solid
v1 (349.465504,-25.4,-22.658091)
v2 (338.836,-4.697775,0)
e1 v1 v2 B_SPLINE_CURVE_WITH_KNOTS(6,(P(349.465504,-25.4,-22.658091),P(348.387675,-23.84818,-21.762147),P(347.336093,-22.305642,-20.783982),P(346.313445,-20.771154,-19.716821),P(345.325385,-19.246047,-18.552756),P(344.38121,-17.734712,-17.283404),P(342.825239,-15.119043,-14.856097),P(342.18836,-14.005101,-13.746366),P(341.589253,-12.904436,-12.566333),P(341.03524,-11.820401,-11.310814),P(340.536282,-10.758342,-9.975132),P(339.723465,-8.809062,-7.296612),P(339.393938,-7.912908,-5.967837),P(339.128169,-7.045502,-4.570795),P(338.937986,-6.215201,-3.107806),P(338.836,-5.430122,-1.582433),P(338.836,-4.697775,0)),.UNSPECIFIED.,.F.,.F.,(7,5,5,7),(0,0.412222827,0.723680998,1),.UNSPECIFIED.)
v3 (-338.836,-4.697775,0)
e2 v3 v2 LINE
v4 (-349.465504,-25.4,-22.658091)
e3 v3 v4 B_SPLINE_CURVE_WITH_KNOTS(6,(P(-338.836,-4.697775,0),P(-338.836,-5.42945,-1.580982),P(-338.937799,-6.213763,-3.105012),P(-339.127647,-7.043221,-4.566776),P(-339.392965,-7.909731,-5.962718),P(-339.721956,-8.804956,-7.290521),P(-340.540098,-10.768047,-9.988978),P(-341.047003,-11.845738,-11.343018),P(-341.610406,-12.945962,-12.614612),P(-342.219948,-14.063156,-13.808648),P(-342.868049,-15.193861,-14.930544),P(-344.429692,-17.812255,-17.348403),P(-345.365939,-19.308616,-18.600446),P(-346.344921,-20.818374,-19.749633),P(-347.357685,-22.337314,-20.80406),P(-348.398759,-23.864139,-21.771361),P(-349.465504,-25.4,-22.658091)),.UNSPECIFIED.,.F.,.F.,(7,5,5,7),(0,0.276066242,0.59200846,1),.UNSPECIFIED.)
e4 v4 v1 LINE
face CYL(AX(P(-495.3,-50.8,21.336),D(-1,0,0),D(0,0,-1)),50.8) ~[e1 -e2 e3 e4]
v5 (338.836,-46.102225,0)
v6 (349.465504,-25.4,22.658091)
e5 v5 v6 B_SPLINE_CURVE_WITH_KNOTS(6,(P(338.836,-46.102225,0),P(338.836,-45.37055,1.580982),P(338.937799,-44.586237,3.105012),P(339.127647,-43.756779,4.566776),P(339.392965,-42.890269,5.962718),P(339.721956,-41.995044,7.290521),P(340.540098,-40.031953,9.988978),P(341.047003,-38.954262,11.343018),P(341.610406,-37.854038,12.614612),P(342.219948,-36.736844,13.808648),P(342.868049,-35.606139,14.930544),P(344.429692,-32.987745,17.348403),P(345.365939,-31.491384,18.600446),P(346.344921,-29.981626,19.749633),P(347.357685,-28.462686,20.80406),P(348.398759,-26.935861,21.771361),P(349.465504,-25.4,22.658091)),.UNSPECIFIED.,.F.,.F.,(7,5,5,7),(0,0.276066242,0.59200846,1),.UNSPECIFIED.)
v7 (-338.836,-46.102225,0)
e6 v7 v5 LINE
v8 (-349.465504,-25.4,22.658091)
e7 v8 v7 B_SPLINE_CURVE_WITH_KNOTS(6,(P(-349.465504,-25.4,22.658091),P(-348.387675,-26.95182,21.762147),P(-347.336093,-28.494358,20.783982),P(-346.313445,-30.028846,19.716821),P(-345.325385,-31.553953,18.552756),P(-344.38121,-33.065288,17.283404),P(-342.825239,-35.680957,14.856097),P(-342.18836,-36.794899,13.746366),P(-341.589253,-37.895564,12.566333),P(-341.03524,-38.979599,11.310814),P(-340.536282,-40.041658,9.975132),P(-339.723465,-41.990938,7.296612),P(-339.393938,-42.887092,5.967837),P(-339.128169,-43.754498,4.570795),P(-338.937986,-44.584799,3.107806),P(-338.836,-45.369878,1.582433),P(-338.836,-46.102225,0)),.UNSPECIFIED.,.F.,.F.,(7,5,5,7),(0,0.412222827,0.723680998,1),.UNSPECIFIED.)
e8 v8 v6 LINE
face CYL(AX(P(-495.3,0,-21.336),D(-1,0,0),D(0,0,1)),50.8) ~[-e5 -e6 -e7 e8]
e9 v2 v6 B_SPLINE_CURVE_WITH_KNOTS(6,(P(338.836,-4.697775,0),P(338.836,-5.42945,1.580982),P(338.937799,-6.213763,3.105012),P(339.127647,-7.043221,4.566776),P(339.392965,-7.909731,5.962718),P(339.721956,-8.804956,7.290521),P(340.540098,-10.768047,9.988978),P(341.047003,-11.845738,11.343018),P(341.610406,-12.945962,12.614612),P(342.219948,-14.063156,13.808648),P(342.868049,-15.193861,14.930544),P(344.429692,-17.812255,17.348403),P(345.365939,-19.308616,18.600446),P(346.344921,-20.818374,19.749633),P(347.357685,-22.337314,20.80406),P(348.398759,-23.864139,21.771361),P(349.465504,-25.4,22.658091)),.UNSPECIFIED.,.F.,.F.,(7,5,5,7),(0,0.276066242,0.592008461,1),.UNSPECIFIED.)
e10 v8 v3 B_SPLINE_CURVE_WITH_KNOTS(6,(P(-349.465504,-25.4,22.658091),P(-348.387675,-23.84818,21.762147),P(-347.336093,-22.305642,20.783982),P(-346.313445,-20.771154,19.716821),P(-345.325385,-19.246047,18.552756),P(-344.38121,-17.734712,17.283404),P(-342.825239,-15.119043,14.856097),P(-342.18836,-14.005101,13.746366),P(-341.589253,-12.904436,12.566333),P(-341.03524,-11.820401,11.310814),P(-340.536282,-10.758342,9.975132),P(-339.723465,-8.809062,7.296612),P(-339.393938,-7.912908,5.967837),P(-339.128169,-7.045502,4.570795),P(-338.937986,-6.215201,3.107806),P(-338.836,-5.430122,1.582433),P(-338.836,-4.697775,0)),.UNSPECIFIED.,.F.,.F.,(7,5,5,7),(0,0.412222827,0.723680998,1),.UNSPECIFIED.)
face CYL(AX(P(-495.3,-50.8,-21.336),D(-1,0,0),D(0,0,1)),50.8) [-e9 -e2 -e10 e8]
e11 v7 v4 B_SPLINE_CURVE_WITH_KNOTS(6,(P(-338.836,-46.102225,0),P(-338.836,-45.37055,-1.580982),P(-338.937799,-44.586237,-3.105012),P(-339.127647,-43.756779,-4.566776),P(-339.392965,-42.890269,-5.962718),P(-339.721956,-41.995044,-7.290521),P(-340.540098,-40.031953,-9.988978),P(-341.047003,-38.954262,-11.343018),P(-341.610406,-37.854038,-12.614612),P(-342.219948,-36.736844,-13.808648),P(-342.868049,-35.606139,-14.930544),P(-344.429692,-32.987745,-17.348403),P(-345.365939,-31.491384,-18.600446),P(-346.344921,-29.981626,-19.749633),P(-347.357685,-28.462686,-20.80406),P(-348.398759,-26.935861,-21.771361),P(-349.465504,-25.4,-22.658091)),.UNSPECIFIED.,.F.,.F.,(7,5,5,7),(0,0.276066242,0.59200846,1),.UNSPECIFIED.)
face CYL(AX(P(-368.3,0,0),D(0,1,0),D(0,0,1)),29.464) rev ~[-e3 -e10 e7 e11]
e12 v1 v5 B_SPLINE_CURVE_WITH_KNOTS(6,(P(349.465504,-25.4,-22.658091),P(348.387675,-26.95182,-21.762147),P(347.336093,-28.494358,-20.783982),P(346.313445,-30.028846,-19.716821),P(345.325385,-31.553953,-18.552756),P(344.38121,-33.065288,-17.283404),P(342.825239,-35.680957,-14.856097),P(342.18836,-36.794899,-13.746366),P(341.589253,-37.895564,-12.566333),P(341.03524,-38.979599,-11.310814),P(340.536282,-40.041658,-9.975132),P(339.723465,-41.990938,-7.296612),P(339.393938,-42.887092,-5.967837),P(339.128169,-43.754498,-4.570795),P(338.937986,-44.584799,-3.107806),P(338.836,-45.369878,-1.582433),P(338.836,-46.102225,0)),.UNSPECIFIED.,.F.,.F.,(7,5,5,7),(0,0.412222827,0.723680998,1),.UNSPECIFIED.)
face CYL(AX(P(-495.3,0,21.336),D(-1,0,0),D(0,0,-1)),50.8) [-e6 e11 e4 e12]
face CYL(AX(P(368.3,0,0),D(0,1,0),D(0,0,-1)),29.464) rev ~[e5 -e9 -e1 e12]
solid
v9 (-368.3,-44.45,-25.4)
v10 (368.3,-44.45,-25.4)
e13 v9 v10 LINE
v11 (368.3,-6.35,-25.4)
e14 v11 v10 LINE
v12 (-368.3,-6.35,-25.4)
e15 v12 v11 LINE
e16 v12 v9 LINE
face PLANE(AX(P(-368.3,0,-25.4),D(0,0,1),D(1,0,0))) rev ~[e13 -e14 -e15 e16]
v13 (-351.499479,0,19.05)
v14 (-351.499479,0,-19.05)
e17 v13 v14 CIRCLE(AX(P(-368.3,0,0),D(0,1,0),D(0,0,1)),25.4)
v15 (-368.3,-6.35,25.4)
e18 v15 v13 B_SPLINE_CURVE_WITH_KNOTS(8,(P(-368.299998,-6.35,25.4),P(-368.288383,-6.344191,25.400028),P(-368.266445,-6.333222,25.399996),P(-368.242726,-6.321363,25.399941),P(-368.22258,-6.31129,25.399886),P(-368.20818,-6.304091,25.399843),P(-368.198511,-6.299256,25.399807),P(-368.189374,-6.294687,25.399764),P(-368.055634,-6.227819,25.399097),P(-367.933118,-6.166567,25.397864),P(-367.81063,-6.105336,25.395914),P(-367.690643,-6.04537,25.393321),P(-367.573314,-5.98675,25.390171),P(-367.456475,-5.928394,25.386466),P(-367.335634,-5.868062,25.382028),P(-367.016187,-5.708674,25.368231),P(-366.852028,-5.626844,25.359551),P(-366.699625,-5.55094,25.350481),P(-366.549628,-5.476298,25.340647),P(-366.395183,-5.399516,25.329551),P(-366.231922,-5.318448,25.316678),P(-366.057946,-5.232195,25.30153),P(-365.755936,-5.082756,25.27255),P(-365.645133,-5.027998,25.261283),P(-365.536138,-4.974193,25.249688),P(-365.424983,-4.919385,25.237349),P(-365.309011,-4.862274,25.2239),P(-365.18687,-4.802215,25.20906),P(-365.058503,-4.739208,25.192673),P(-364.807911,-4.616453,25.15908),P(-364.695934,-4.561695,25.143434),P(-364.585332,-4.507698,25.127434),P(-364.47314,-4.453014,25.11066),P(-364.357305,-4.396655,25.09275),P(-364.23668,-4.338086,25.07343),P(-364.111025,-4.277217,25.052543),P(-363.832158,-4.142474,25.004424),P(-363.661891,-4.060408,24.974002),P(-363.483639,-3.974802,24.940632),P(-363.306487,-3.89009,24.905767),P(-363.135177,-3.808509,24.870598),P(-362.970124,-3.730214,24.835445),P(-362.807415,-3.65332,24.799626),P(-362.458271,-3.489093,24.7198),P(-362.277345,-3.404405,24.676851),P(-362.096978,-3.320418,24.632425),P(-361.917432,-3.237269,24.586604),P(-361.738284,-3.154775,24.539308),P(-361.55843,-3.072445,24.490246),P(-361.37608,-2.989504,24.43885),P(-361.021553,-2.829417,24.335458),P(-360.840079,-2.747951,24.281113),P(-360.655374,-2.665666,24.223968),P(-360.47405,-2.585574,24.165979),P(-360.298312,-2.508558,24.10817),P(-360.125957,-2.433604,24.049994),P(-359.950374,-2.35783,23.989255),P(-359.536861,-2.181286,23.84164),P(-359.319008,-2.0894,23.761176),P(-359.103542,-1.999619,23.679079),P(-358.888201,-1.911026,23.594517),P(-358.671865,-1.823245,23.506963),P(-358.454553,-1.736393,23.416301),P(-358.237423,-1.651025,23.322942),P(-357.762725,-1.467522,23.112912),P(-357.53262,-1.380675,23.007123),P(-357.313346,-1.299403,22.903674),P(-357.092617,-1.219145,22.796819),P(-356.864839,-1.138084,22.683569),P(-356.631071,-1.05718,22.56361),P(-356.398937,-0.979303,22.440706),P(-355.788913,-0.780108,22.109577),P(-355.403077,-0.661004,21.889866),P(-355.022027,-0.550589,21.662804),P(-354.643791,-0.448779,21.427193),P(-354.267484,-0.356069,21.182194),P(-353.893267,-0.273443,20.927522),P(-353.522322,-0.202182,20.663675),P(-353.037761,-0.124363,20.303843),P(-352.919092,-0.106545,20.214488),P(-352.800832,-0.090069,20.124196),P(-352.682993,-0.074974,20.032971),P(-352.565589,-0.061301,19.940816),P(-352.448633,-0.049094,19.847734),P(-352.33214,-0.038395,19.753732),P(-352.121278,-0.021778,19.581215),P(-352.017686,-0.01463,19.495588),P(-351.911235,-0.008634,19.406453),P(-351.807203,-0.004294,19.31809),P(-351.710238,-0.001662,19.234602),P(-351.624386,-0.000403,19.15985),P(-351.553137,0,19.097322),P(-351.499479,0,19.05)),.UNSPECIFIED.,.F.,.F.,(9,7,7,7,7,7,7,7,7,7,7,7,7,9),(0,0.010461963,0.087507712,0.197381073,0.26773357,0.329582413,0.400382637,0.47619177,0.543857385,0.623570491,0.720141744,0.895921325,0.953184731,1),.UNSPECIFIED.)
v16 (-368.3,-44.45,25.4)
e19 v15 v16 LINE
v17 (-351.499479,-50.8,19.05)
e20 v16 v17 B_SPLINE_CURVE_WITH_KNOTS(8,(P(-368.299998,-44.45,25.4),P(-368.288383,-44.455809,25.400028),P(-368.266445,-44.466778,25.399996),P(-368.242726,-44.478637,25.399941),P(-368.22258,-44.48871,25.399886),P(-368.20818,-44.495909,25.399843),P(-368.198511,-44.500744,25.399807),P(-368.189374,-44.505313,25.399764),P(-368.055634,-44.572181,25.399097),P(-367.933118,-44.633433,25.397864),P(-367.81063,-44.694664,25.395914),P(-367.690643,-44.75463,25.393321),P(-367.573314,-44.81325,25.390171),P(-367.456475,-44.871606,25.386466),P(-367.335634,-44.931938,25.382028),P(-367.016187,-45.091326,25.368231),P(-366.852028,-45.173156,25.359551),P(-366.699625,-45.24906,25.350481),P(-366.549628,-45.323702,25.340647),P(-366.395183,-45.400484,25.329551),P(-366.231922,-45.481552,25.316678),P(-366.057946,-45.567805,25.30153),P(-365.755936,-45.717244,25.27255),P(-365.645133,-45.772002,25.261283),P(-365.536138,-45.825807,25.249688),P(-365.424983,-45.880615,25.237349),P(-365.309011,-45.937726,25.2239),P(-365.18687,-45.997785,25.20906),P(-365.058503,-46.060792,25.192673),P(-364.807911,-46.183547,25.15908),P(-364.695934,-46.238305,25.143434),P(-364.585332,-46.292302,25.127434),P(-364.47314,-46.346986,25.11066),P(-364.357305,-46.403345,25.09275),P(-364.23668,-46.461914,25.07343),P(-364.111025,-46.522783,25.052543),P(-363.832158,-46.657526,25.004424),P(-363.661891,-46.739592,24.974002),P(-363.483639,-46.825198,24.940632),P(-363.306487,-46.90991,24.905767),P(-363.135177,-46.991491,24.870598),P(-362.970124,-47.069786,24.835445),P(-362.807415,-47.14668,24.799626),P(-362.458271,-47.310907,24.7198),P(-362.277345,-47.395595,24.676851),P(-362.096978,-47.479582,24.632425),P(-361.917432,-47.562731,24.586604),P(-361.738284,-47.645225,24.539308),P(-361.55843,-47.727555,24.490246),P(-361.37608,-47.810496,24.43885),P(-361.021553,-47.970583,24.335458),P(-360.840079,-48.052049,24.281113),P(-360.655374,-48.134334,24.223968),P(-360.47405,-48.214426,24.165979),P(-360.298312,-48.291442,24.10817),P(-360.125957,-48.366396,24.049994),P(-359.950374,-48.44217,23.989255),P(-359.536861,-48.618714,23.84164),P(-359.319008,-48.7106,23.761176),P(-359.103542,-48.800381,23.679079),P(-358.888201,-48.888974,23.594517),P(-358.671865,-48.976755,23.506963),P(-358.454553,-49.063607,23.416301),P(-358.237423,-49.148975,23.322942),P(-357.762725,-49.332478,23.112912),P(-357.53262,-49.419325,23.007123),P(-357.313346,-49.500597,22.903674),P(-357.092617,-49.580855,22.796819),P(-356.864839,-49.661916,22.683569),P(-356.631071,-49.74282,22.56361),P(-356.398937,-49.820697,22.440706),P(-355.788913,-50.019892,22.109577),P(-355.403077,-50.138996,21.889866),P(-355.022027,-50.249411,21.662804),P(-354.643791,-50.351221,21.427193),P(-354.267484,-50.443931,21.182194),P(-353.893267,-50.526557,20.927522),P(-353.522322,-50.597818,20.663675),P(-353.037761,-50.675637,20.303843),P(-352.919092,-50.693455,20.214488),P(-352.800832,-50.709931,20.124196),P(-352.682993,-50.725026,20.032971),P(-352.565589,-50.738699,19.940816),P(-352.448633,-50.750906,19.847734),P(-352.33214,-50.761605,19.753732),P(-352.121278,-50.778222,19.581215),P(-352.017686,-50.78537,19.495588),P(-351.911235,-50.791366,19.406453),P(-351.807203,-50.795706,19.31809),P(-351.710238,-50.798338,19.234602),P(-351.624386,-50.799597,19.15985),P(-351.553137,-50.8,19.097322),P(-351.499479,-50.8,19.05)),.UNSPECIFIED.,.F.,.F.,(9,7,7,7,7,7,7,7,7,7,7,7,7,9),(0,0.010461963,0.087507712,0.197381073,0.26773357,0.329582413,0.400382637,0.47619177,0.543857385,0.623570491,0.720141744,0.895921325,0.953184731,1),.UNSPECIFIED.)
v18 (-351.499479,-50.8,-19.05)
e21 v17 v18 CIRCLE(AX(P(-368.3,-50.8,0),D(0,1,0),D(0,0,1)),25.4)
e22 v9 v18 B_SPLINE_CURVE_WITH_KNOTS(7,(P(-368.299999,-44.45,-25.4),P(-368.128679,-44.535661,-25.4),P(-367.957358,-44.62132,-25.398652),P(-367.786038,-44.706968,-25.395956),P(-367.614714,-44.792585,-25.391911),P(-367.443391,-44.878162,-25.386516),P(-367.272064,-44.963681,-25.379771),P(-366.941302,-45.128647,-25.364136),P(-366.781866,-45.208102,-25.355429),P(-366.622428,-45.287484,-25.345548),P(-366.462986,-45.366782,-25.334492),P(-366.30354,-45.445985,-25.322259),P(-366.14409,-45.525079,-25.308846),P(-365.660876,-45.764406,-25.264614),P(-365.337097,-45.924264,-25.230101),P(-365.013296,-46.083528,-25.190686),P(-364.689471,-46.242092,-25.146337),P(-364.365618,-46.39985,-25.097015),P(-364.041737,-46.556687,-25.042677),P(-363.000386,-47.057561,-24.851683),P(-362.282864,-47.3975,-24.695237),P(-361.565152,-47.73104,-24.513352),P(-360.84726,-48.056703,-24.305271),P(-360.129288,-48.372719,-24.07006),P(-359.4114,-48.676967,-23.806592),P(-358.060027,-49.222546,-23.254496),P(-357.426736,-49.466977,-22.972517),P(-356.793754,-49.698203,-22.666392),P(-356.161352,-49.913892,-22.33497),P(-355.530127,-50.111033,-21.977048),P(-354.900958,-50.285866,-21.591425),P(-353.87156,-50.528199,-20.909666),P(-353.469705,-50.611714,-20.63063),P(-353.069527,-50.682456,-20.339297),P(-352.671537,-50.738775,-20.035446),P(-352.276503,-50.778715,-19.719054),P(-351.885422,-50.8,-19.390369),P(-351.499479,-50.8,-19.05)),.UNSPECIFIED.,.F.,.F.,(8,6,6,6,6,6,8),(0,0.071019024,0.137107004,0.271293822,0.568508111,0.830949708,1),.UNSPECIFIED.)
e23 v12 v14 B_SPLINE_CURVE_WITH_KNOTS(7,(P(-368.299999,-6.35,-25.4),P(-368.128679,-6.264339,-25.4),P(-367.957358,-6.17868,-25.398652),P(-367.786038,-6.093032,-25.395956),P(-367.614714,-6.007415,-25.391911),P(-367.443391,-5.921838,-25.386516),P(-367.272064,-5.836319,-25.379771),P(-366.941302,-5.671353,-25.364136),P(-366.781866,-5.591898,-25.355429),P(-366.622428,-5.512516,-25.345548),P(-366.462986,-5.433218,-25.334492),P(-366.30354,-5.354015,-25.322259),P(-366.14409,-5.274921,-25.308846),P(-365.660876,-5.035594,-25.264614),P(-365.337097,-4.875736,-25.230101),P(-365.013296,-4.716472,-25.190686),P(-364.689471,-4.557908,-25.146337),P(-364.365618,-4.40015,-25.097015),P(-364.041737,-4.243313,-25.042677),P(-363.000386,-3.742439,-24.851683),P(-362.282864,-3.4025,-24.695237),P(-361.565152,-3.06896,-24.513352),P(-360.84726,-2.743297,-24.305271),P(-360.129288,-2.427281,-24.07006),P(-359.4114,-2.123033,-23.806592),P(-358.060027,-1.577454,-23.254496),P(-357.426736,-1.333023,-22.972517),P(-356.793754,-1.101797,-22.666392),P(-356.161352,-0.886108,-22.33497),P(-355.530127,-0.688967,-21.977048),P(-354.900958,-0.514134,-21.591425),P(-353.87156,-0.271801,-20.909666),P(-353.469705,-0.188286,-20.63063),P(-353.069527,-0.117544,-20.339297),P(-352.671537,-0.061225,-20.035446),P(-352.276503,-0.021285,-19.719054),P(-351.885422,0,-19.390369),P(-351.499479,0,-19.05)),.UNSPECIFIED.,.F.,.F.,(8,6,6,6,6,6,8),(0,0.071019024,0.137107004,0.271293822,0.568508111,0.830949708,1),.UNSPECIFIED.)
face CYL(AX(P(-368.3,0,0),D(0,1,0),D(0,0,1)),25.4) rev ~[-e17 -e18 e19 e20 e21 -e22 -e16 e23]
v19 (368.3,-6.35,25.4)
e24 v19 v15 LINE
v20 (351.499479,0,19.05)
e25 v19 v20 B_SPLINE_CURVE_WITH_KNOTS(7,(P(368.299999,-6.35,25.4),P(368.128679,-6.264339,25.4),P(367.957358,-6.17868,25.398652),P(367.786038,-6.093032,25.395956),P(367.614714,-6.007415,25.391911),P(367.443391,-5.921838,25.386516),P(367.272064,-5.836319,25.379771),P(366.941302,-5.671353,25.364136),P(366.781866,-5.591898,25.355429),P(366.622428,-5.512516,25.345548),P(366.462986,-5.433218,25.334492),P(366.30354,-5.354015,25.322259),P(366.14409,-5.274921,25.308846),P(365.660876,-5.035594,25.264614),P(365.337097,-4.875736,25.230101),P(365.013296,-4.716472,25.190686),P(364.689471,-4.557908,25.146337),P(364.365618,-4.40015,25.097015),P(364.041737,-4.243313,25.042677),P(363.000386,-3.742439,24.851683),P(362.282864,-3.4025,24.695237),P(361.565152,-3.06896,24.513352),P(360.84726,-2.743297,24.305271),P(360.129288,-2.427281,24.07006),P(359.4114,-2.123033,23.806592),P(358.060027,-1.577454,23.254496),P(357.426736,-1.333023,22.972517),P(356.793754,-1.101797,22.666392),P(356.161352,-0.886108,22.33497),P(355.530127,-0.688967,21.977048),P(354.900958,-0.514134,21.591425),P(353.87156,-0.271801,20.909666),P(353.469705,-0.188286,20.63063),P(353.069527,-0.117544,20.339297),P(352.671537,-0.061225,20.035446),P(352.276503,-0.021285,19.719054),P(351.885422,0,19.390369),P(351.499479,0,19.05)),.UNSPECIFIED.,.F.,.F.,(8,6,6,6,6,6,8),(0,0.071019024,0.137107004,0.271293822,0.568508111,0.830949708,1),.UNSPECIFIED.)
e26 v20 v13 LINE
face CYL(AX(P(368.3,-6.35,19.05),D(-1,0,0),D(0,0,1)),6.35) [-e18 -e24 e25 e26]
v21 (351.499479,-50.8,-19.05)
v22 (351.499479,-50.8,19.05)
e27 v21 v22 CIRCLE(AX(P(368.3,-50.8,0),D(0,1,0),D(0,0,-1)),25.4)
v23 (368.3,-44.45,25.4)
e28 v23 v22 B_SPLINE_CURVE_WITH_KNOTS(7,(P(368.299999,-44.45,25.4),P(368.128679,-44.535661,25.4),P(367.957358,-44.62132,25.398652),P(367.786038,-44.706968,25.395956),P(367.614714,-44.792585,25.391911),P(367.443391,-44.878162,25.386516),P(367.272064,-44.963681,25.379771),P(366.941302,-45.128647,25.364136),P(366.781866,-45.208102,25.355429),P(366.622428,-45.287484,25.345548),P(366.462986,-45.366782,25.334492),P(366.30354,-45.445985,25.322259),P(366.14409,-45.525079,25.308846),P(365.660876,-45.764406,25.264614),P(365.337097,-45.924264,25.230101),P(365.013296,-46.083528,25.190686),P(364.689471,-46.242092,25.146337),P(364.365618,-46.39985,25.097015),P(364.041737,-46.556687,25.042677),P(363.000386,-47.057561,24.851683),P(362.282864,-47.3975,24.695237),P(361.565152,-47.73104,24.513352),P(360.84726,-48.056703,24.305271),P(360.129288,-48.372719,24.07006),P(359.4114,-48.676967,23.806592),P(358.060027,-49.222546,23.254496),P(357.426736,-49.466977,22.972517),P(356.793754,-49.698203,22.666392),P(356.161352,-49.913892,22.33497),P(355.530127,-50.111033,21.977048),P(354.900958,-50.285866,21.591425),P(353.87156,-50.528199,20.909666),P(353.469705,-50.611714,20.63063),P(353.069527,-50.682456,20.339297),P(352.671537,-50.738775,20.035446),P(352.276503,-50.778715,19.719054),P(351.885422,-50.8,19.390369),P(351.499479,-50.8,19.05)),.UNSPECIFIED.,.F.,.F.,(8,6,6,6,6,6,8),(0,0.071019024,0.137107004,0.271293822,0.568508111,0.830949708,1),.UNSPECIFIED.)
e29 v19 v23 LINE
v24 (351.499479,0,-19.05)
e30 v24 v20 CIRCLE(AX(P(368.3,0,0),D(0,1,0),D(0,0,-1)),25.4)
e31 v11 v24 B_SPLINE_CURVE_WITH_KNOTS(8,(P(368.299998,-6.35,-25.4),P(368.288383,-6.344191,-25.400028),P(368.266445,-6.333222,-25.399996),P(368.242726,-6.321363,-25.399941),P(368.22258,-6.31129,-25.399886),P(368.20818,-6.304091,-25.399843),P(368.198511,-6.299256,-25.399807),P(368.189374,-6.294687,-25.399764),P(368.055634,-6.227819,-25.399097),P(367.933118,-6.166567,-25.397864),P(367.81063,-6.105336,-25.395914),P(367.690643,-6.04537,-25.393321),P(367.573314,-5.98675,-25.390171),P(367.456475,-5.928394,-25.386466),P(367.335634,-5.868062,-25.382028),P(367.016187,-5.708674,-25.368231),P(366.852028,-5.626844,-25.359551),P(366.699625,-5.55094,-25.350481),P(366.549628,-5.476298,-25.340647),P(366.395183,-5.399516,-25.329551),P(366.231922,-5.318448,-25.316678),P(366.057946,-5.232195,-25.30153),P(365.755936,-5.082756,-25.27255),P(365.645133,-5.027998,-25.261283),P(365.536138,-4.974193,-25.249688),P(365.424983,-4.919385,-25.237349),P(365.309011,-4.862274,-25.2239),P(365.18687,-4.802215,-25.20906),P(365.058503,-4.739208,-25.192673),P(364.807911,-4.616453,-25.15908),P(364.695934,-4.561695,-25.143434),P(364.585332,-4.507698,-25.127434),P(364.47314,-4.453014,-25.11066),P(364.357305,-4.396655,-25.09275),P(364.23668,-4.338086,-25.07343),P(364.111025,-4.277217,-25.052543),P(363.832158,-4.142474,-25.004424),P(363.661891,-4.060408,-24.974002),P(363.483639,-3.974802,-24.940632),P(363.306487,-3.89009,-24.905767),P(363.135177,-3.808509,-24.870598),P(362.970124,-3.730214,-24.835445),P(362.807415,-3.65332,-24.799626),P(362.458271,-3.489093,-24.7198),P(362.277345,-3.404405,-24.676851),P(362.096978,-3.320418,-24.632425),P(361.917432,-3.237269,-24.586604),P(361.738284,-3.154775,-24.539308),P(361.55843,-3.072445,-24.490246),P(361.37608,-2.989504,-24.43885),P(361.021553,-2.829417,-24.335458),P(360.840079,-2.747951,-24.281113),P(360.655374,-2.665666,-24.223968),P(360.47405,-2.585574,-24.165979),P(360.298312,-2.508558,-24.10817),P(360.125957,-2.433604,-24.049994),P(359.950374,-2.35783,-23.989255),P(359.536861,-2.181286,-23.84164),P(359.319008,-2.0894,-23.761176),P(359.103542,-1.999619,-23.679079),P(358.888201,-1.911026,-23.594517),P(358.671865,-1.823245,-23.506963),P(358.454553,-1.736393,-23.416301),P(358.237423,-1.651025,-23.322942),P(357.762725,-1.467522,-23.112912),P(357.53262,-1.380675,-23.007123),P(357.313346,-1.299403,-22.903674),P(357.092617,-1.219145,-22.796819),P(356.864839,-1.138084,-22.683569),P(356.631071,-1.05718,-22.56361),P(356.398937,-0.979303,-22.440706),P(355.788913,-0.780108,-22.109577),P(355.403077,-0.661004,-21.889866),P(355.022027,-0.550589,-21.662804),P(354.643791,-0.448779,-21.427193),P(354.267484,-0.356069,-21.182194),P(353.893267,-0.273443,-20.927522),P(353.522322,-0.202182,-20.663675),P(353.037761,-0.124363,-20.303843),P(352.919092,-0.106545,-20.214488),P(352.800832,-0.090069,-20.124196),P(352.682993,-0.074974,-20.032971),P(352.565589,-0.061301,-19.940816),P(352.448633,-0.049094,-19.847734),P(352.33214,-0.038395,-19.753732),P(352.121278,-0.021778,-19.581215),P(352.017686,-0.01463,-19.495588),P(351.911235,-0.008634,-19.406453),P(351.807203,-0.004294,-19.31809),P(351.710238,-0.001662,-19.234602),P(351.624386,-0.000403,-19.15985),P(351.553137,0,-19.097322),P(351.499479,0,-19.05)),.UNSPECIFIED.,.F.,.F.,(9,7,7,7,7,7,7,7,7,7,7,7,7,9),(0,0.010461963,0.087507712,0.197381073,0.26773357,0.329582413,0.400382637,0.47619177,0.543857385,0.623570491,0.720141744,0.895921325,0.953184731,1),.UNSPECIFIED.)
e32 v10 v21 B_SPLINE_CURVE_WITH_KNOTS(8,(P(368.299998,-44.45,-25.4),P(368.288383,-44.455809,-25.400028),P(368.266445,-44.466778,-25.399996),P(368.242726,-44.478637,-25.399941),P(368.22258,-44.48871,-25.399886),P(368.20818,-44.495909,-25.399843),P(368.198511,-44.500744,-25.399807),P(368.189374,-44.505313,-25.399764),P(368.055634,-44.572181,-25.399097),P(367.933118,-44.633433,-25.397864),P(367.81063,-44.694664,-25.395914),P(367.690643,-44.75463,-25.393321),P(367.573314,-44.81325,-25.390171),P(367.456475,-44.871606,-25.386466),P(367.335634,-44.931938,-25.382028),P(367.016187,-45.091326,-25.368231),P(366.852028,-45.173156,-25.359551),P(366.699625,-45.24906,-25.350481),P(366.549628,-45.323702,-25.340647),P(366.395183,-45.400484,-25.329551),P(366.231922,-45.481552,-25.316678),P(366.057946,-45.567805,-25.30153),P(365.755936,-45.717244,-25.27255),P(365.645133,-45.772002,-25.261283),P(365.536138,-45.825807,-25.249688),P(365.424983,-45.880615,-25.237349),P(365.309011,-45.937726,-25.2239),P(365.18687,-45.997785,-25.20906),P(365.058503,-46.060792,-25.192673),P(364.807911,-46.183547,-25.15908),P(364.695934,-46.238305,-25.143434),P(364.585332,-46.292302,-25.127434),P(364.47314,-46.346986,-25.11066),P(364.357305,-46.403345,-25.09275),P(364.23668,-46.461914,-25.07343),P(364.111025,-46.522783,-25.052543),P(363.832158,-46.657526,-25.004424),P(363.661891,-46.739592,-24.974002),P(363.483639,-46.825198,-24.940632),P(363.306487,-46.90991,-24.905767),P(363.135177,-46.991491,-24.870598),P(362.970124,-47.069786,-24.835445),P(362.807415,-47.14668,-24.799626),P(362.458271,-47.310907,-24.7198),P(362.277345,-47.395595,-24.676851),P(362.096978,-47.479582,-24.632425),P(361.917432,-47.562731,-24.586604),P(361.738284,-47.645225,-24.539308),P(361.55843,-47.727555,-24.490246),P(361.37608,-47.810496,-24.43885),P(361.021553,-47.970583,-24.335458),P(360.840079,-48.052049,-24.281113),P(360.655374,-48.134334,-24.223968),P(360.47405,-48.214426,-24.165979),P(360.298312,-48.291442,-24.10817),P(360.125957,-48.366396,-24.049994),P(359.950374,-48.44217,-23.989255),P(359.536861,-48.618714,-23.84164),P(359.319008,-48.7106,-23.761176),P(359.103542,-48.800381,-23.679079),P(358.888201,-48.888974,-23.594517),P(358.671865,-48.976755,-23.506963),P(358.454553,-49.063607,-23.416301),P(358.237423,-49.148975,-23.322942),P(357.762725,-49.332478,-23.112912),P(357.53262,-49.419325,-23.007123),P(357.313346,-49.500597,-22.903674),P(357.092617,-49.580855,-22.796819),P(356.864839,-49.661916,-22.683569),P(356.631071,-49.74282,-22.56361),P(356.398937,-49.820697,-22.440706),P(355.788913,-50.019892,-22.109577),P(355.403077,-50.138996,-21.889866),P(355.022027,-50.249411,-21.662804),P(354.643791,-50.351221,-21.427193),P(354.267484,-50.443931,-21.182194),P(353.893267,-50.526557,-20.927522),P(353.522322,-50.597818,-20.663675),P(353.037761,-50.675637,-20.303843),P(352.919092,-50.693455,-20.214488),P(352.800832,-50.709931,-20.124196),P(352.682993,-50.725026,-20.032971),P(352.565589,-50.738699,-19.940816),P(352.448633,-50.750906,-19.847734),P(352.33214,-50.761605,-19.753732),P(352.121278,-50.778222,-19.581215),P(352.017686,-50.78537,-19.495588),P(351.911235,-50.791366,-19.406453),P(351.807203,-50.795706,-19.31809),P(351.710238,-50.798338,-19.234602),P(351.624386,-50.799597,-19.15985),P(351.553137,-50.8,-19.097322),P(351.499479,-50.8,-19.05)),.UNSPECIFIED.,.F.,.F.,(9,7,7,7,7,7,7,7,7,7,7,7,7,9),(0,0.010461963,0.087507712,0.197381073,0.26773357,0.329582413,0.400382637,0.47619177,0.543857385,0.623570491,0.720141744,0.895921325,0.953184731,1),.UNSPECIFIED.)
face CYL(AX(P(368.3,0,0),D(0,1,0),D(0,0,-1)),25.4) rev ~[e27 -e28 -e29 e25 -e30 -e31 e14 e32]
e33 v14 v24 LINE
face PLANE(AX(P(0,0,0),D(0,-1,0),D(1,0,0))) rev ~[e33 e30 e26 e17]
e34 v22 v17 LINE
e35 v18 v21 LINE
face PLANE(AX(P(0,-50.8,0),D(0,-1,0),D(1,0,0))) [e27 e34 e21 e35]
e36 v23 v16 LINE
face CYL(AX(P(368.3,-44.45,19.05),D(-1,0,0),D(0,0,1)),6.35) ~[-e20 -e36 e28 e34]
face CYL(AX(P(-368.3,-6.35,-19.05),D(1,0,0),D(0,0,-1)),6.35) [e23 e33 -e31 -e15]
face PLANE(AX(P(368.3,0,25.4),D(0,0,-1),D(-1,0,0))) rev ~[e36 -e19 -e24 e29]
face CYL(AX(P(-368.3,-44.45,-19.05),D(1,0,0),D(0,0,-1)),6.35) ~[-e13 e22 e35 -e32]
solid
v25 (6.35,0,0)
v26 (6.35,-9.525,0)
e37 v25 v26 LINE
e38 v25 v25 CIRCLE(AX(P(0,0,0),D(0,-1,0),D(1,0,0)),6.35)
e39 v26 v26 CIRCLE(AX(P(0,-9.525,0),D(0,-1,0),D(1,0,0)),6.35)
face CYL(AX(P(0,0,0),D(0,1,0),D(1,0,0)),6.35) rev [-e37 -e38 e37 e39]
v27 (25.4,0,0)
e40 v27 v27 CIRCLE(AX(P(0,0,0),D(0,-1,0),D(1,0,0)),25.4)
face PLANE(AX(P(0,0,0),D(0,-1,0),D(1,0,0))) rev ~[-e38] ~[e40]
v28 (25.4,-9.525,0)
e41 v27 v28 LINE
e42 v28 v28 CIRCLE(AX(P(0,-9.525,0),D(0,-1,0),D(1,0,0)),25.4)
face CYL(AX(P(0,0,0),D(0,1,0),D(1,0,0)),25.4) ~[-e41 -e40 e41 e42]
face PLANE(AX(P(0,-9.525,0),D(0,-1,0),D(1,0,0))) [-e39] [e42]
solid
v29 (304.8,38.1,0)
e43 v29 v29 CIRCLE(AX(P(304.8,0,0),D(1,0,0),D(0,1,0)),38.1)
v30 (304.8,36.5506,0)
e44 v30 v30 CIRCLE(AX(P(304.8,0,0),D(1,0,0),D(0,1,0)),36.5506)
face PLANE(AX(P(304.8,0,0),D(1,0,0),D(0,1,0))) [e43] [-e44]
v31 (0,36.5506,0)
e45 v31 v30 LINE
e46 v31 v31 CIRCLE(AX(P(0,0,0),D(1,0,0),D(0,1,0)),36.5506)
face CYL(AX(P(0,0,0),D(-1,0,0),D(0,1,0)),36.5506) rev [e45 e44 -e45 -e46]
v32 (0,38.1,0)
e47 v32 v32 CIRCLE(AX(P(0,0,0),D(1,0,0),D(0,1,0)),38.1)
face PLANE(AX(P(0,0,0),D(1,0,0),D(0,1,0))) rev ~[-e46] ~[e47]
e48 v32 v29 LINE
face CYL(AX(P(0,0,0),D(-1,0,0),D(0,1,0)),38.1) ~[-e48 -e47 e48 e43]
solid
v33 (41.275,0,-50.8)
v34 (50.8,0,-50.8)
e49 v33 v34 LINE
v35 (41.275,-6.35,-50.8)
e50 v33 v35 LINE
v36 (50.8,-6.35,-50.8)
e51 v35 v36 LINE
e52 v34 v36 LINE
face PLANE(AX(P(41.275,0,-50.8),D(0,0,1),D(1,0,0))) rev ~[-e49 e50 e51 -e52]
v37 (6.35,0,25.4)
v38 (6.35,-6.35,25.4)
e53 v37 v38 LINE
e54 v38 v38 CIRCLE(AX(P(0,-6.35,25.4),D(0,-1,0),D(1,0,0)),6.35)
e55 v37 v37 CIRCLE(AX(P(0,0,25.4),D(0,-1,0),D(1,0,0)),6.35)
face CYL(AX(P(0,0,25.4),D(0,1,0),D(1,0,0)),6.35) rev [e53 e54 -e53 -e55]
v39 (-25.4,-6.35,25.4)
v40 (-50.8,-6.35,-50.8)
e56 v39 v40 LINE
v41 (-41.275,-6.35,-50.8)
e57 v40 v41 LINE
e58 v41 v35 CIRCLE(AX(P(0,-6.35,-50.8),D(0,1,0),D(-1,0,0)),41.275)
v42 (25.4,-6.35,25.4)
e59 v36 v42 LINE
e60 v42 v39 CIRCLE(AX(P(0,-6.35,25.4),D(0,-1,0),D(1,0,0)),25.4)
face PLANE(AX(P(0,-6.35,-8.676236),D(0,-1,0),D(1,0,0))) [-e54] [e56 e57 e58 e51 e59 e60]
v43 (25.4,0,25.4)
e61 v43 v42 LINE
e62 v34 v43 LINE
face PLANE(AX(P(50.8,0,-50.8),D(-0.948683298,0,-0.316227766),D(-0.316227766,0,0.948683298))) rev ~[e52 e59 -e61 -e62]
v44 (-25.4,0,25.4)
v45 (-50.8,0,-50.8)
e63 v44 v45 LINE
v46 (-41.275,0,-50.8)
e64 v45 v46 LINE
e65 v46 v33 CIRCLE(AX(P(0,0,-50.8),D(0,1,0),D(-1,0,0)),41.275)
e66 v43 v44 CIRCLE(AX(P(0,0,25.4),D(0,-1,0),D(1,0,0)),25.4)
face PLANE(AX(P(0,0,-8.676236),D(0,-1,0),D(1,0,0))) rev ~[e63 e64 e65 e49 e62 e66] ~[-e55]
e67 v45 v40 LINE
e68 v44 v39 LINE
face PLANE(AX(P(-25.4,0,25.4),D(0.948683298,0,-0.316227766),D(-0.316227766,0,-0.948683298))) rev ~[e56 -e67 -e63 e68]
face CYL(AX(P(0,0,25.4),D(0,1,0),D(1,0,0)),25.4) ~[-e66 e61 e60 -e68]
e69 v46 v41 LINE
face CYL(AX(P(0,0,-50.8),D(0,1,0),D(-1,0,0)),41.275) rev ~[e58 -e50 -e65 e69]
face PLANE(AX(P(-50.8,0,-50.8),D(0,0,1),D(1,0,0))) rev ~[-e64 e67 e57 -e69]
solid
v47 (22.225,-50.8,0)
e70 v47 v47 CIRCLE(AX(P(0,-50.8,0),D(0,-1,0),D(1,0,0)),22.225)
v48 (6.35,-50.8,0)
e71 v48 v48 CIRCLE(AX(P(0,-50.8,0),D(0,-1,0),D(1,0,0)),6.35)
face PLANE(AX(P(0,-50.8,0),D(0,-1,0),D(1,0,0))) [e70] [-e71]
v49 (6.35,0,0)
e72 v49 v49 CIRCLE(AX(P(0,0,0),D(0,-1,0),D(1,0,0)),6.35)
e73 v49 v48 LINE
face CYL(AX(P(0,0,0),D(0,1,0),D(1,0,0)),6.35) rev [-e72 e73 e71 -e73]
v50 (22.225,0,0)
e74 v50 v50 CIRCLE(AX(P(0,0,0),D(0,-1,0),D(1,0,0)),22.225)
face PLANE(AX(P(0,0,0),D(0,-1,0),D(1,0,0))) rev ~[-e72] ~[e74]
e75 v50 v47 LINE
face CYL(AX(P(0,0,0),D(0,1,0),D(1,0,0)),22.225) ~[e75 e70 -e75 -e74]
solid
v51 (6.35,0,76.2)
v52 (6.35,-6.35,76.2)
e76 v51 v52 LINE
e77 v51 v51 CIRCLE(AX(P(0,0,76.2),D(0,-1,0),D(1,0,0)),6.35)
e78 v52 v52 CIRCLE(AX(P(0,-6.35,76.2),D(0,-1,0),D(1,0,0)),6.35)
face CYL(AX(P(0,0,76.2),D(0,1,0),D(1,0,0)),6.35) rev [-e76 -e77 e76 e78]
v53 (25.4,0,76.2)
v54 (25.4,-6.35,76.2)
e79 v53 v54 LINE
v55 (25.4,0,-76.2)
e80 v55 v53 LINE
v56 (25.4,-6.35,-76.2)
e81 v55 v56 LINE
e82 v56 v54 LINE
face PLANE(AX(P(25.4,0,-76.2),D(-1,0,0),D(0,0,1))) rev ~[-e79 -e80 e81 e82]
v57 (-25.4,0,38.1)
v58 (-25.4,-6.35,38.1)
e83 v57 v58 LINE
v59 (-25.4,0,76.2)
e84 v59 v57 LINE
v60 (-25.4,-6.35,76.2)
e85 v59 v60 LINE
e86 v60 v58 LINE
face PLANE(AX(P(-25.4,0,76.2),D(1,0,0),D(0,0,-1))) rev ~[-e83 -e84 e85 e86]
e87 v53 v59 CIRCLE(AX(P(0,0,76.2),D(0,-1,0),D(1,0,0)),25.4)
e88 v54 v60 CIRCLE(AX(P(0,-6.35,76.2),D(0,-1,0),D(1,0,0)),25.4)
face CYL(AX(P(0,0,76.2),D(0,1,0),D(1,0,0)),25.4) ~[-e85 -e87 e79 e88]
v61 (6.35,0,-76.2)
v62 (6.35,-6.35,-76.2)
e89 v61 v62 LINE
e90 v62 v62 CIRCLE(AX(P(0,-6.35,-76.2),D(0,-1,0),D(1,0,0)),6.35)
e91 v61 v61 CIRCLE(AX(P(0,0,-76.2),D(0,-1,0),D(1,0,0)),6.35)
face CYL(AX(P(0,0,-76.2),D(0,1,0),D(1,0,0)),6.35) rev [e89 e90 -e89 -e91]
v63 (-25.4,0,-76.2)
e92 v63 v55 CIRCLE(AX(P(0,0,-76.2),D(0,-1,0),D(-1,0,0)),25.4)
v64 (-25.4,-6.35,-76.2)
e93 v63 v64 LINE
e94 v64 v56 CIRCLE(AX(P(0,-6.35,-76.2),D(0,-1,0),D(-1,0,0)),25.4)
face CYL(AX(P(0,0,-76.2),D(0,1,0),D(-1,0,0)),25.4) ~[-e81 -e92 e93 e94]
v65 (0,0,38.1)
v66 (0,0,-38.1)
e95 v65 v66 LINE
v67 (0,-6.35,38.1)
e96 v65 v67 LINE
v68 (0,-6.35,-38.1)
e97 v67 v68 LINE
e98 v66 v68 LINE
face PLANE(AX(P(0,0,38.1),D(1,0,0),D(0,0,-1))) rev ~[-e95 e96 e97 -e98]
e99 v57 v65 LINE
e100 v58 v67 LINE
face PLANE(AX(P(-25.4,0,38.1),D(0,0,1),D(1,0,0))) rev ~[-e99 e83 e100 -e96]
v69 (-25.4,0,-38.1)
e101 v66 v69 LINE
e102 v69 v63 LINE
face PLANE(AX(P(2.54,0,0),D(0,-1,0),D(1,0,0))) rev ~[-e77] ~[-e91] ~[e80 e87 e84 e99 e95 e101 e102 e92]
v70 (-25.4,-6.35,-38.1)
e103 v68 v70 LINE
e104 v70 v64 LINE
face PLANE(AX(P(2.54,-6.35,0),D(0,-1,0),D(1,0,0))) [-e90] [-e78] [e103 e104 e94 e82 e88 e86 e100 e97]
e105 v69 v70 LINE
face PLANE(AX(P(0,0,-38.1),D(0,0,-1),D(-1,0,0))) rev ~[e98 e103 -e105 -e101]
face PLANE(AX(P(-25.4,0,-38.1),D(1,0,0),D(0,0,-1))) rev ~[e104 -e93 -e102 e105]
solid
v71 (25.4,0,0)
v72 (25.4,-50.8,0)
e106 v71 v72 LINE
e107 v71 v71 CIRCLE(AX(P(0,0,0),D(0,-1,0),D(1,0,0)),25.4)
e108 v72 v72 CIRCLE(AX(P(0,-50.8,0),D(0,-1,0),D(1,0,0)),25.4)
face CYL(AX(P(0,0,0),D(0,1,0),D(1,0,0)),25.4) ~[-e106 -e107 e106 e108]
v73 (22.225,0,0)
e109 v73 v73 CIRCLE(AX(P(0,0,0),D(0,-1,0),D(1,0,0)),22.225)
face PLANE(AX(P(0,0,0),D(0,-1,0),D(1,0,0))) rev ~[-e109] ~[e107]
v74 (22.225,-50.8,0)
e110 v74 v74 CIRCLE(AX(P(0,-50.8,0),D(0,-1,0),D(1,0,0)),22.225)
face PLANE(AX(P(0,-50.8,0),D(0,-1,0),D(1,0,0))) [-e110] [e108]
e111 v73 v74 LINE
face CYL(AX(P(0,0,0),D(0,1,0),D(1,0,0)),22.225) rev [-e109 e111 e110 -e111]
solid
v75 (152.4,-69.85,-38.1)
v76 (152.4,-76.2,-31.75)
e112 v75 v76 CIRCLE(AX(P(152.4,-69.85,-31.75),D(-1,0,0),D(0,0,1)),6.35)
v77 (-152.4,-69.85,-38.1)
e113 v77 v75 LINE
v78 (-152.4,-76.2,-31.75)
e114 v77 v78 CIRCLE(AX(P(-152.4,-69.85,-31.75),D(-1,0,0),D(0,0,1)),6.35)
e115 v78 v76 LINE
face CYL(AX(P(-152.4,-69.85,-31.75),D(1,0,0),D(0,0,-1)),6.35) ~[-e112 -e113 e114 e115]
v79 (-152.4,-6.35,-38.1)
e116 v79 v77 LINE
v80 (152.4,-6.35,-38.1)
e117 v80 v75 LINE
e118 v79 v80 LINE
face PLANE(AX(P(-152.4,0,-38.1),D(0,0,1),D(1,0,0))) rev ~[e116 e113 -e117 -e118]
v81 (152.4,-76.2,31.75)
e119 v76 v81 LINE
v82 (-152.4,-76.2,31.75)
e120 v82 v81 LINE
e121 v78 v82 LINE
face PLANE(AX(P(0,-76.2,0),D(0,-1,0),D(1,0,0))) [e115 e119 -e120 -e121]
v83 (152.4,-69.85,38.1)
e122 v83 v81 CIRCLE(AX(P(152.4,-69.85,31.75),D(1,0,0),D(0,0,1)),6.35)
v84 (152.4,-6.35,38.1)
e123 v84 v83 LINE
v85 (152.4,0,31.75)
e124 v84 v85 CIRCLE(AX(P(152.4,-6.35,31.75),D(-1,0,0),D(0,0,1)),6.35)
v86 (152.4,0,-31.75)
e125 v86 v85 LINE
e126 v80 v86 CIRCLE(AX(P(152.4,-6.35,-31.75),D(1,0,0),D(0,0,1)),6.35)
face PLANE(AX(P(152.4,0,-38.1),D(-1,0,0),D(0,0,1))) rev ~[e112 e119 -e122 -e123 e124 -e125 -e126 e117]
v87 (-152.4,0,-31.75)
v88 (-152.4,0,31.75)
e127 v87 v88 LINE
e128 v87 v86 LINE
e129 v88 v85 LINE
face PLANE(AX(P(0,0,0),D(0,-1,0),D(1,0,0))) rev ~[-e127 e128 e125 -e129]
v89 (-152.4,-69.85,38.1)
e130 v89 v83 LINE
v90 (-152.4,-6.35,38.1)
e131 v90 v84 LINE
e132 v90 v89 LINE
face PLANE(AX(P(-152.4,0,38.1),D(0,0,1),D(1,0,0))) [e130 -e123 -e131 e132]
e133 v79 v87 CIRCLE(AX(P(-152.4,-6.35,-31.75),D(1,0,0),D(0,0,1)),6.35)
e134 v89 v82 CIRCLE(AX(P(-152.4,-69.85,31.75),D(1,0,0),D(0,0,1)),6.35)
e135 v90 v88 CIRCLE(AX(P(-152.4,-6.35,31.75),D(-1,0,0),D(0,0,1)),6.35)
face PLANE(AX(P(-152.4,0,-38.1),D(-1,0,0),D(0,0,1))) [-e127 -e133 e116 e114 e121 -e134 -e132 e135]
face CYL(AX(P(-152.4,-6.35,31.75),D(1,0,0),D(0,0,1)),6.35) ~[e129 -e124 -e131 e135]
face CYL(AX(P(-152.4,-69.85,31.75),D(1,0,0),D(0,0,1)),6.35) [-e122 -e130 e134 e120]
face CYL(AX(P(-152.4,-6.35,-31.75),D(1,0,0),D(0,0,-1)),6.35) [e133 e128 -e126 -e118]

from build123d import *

# Parameters (mm, degrees)
F1_DEPTH    = 50.8
F2_R        = 6.35
F3_R        = 25.4
F3_R_2      = 22.225
F4_DEPTH    = 50.8
F6_DEPTH    = 50.8
F7_T1_DEPTH = 990.6
F8_R        = 6.35
F9_DEPTH    = 6.35
F10_R       = 22.225
F10_R_2     = 6.35
F11_DEPTH   = 50.8
F12_R       = 25.4
F12_R_2     = 6.35
F13_DEPTH   = 9.525
F14_R       = 38.1
F14_R_2     = 36.5506
F15_DEPTH   = 304.8
F16_R       = 6.35
F17_DEPTH   = 6.35
F18_W       = 304.8
F18_H       = 76.2
F19_DEPTH   = 76.2
F20_R       = 6.35


# Not quite as in the source:
# - a fillet or chamfer that OpenCascade refuses, or shapes differently, is made with other operations: its cross-section is extruded or revolved along the edge and cut away or added


with BuildPart() as f1:
    # F0 (on Front) → F1 (new body)
    with BuildSketch(Plane.XZ):
        with BuildLine():
            ThreePointArc((368.3, -25.4), (342.9, 0), (368.3, 25.4))
            Line((368.3, 25.4), (-368.3, 25.4))
            ThreePointArc((-368.3, 25.4), (-342.9, 0), (-368.3, -25.4))
            Line((-368.3, -25.4), (368.3, -25.4))
        make_face()
    extrude(amount=F1_DEPTH)

    # F2
    f2_edges = [f1.edges().sort_by_distance(p)[0] for p in [
        (0, -50.8, -25.4),
        (0, -50.8, 25.4),
        (0, 0, 25.4),
        (0, 0, -25.4),
    ]]
    fillet(f2_edges, radius=F2_R)


with BuildPart() as f4:
    # F3 (on Front) → F4 (new body)
    with BuildSketch(Plane.XZ):
        Circle(F3_R)
        Circle(F3_R_2, mode=Mode.SUBTRACT)
    extrude(amount=F4_DEPTH)


with BuildPart() as f6:
    # F5 (on Front) → F6 (new body)
    with BuildSketch(Plane.XZ):
        with BuildLine():
            ThreePointArc((368.3, -29.464), (338.836, 0), (368.3, 29.464))
            Line((368.3, 29.464), (-368.3, 29.464))
            ThreePointArc((-368.3, 29.464), (-338.836, 0), (-368.3, -29.464))
            Line((-368.3, -29.464), (368.3, -29.464))
        make_face()
    extrude(amount=F6_DEPTH)

    # F7: fillet of radius 50.8 on 4 edges, made by hand

    # F7_s2 → F7_t1 (cut)
    with BuildSketch(Plane.YZ.offset(-495.3)):
        with BuildLine():
            ThreePointArc((0, -29.464), (-35.9210244843, -14.5850244843), (-50.8, 21.336))
            Line((-50.8, 21.336), (-50.8, -29.464))
            Line((-50.8, -29.464), (0, -29.464))
        make_face()
        with BuildLine():
            ThreePointArc((0, 29.464), (-35.9210244843, 14.5850244843), (-50.8, -21.336))
            Line((-50.8, -21.336), (-50.8, 29.464))
            Line((-50.8, 29.464), (0, 29.464))
        make_face()
        with BuildLine():
            ThreePointArc((-50.8, -29.464), (-14.8789755157, -14.5850244843), (0, 21.336))
            Line((0, 21.336), (0, -29.464))
            Line((0, -29.464), (-50.8, -29.464))
        make_face()
        with BuildLine():
            ThreePointArc((-50.8, 29.464), (-14.8789755157, 14.5850244843), (0, -21.336))
            Line((0, -21.336), (0, 29.464))
            Line((0, 29.464), (-50.8, 29.464))
        make_face()
    extrude(amount=F7_T1_DEPTH, mode=Mode.SUBTRACT)


with BuildPart() as f9:
    # F8 (on Front) → F9 (new body)
    with BuildSketch(Plane.XZ):
        with BuildLine():
            Line((41.275, -50.8), (50.8, -50.8))
            Line((50.8, -50.8), (25.4, 25.4))
            ThreePointArc((25.4, 25.4), (0, 50.8), (-25.4, 25.4))
            Line((-25.4, 25.4), (-50.8, -50.8))
            Line((-50.8, -50.8), (-41.275, -50.8))
            ThreePointArc((-41.275, -50.8), (0, -9.525), (41.275, -50.8))
        make_face()
        with Locations((0, 25.4)):
            Circle(F8_R, mode=Mode.SUBTRACT)
    extrude(amount=F9_DEPTH)


with BuildPart() as f11:
    # F10 (on Front) → F11 (new body)
    with BuildSketch(Plane.XZ):
        Circle(F10_R)
        Circle(F10_R_2, mode=Mode.SUBTRACT)
    extrude(amount=F11_DEPTH)


with BuildPart() as f13:
    # F12 (on Front) → F13 (new body)
    with BuildSketch(Plane.XZ):
        Circle(F12_R)
        Circle(F12_R_2, mode=Mode.SUBTRACT)
    extrude(amount=F13_DEPTH)


with BuildPart() as f15:
    # F14 (on Right) → F15 (new body)
    with BuildSketch(Plane.YZ):
        Circle(F14_R)
        Circle(F14_R_2, mode=Mode.SUBTRACT)
    extrude(amount=F15_DEPTH)


with BuildPart() as f17:
    # F16 (on Front) → F17 (new body)
    with BuildSketch(Plane.XZ):
        with BuildLine():
            Line((25.4, -76.2), (25.4, 76.2))
            ThreePointArc((25.4, 76.2), (0, 101.6), (-25.4, 76.2))
            Line((-25.4, 76.2), (-25.4, 38.1))
            Line((-25.4, 38.1), (0, 38.1))
            Line((0, 38.1), (0, -38.1))
            Line((0, -38.1), (-25.4, -38.1))
            Line((-25.4, -38.1), (-25.4, -76.2))
            ThreePointArc((-25.4, -76.2), (0, -101.6), (25.4, -76.2))
        make_face()
        with Locations((0, -76.2)):
            Circle(F16_R, mode=Mode.SUBTRACT)
        with Locations((0, 76.2)):
            Circle(F16_R, mode=Mode.SUBTRACT)
    extrude(amount=F17_DEPTH)


with BuildPart() as f19:
    # F18 (on Front) → F19 (new body)
    with BuildSketch(Plane.XZ):
        Rectangle(F18_W, F18_H)
    extrude(amount=F19_DEPTH)

    # F20
    f20_edges = [f19.edges().sort_by_distance(p)[0] for p in [
        (0, -76.2, 38.1),
        (0, -76.2, -38.1),
        (0, 0, 38.1),
        (0, 0, -38.1),
    ]]
    fillet(f20_edges, radius=F20_R)


solid = Compound([f1.part, f4.part, f6.part, f9.part, f11.part, f13.part, f15.part, f17.part, f19.part])
